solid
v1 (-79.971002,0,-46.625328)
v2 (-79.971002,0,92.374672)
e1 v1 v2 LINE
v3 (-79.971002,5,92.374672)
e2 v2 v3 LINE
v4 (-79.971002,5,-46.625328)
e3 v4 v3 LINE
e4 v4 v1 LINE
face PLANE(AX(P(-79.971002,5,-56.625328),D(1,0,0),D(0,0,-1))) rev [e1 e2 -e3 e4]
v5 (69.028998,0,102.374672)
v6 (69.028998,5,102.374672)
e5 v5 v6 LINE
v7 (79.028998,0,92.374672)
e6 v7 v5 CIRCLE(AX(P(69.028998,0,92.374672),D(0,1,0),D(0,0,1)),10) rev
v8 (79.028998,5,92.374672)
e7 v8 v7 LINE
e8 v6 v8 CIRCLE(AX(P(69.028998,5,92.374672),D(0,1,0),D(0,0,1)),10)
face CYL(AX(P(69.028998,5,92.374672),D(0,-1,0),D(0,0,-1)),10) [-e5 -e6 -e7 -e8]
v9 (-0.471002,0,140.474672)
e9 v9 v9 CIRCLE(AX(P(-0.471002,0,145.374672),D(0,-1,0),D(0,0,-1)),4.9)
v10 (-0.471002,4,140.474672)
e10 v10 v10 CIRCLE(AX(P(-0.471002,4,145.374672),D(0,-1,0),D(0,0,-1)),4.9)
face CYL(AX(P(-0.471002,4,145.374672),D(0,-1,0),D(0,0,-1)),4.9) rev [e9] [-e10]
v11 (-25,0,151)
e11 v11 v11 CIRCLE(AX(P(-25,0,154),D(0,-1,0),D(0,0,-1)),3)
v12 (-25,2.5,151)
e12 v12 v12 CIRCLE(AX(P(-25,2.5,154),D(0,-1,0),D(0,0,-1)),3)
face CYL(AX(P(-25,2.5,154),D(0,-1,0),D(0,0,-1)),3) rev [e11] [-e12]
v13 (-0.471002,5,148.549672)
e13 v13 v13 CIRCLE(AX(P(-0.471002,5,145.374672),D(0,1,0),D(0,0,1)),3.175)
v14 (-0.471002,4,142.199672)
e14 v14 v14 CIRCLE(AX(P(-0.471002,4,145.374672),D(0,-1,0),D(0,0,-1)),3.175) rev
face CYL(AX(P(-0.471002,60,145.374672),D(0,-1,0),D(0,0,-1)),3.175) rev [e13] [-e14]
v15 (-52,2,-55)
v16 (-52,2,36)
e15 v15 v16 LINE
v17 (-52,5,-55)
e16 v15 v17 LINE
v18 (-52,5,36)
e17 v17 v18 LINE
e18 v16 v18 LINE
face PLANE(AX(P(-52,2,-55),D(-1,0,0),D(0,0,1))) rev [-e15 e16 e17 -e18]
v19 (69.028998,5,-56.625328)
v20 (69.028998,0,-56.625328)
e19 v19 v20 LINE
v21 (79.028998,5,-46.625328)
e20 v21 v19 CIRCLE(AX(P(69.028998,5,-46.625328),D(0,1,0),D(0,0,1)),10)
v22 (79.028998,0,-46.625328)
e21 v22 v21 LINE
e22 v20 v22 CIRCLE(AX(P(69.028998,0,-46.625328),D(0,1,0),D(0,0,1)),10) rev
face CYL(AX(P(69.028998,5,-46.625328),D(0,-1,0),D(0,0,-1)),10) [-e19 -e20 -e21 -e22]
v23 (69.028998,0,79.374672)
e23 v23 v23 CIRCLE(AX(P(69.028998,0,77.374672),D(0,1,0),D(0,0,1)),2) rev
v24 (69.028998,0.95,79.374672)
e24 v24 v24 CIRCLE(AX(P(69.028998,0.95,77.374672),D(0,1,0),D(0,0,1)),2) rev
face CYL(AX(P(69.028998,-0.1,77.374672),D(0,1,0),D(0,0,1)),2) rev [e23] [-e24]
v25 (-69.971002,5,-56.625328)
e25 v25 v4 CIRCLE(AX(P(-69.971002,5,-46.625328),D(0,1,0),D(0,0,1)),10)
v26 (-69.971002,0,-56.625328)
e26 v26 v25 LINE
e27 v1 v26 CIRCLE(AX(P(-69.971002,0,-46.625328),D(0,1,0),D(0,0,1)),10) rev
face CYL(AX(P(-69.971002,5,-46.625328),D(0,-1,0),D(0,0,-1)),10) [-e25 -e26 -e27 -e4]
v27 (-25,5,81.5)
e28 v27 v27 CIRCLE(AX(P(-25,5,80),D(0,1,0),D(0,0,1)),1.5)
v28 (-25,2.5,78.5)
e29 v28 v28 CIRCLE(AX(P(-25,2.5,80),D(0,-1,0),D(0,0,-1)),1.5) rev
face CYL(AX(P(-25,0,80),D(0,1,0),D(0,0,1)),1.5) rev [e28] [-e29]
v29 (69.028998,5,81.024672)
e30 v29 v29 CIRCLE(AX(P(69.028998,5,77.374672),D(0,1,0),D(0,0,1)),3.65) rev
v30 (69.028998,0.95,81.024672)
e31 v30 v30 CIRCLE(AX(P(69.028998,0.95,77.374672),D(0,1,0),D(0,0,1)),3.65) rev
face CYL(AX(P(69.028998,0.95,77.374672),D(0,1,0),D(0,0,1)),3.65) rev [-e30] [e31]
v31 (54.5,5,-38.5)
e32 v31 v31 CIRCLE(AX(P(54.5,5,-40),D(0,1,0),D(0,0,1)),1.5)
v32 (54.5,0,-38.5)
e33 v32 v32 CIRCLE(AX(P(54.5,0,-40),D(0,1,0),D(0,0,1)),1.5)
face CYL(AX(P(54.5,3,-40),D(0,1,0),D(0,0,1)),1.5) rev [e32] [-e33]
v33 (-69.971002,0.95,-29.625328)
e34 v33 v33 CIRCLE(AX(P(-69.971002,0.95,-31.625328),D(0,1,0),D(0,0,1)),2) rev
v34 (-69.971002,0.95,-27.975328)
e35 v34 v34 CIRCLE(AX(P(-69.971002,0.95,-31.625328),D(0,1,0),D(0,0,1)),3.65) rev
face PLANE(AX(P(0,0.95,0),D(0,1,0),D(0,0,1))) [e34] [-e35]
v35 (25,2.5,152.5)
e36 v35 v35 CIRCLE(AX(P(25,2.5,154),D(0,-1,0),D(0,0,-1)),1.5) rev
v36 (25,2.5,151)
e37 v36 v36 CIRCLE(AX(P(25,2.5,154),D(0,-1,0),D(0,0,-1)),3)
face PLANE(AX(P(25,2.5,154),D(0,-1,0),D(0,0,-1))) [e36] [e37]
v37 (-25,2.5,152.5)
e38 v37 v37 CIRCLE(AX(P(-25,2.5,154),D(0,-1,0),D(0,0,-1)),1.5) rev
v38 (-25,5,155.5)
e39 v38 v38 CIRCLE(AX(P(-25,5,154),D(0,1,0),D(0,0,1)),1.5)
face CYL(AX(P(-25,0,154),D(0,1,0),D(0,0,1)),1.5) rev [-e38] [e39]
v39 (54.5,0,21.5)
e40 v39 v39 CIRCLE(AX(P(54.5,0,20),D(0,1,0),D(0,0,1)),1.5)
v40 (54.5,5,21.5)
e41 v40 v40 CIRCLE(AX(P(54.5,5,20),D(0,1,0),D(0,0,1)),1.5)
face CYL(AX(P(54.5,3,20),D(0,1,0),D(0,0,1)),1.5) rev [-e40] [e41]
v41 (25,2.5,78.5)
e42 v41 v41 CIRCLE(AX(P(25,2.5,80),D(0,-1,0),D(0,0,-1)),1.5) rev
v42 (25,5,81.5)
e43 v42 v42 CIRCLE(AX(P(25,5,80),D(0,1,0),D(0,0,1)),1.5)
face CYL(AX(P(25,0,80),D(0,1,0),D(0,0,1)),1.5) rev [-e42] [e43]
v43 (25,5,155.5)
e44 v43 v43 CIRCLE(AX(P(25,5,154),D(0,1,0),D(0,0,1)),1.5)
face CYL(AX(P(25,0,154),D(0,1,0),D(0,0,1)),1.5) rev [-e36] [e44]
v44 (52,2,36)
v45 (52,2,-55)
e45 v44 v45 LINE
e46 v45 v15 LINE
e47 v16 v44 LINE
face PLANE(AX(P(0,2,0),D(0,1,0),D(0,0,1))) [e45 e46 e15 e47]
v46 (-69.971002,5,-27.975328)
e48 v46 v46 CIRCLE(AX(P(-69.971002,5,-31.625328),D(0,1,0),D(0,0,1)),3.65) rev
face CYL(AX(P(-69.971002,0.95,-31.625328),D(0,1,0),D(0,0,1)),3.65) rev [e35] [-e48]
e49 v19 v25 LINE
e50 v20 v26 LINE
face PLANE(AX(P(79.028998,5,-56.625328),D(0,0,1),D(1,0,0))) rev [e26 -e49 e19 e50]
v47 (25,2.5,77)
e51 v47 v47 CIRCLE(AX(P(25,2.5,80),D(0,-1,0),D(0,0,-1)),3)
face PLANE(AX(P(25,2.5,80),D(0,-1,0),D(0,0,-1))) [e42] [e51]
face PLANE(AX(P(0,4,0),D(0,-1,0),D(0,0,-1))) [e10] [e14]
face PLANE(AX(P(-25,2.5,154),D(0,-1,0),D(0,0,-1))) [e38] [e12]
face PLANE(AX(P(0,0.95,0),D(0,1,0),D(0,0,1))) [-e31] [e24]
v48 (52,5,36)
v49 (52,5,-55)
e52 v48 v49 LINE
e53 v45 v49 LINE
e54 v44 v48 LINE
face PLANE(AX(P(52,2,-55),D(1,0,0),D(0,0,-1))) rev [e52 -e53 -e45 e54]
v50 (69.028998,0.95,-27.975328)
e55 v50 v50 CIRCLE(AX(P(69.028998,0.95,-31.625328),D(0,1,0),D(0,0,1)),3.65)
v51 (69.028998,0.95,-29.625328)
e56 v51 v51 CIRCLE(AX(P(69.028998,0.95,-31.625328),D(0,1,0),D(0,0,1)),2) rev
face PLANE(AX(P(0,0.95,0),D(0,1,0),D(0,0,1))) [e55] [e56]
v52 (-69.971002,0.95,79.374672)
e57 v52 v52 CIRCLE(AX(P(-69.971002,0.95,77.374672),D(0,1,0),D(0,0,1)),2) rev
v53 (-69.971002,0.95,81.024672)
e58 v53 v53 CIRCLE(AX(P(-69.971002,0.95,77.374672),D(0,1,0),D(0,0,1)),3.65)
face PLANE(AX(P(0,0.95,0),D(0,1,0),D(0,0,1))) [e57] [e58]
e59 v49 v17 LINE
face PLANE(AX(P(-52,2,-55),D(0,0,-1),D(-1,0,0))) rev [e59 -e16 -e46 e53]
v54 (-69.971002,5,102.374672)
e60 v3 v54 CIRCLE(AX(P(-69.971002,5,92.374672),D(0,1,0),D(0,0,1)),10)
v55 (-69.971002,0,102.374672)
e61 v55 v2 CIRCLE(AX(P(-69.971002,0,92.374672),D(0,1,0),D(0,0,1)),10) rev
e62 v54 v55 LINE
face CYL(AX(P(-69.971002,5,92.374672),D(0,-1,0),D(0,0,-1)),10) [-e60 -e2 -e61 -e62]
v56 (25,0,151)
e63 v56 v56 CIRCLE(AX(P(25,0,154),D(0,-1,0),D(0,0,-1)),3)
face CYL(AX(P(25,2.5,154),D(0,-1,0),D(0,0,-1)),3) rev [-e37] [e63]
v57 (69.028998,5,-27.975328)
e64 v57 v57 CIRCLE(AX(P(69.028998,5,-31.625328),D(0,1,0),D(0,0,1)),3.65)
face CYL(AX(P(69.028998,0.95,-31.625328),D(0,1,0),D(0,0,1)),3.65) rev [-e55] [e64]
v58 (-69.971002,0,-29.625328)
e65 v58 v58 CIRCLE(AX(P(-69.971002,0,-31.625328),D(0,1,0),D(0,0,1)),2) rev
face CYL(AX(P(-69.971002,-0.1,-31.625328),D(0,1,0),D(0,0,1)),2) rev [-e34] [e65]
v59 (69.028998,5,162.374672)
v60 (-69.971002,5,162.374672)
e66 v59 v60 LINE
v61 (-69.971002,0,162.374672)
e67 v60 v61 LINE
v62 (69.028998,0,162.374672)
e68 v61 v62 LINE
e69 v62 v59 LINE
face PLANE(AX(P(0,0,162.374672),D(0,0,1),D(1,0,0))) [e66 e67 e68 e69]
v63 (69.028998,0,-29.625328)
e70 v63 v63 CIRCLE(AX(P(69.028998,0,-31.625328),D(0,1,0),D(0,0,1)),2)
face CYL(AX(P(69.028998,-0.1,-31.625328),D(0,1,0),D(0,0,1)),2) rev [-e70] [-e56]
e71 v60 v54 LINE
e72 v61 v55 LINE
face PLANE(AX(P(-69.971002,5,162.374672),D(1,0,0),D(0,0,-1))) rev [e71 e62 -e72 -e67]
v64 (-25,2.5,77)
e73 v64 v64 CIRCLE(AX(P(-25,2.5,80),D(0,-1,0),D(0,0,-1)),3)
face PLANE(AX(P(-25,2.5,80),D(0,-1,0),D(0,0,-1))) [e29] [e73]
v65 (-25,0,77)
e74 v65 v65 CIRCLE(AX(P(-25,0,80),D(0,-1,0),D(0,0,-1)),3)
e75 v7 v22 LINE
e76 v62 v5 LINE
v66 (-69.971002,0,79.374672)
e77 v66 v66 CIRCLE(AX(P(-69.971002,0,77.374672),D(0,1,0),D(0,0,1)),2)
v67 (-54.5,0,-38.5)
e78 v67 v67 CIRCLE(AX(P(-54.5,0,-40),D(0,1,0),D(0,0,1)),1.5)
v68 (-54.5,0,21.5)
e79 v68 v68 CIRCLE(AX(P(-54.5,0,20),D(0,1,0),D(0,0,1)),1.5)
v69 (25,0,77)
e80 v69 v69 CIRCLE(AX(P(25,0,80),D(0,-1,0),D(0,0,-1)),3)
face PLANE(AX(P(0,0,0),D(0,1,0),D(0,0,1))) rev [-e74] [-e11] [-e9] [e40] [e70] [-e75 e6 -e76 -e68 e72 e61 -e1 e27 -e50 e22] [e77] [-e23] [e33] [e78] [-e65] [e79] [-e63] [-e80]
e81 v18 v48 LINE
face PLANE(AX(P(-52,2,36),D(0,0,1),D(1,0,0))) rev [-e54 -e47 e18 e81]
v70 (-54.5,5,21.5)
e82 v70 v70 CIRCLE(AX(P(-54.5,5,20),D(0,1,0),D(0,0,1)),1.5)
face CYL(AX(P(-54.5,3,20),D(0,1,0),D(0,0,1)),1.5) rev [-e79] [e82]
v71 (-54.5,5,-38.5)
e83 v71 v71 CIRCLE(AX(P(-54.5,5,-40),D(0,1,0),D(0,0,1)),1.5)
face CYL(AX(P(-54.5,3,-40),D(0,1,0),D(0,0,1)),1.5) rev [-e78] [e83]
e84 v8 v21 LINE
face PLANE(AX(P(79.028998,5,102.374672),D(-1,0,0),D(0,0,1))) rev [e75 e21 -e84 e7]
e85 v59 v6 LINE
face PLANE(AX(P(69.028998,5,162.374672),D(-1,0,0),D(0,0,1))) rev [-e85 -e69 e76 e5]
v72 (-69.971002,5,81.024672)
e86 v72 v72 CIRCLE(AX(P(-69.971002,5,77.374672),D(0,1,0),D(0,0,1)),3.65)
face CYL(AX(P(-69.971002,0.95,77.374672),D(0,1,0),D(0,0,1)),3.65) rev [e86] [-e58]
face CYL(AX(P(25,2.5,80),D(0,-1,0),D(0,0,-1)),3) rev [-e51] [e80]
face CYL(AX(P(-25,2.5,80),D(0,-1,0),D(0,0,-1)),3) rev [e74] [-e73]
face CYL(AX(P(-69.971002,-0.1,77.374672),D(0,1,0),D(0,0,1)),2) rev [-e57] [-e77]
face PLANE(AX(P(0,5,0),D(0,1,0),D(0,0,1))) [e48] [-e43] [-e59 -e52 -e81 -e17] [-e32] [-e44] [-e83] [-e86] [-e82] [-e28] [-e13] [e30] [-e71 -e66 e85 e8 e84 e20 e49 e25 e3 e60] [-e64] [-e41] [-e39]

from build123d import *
from build123d.topology import SkipClean

# Parameters (mm, degrees)
SKETCH_1_W               = 159
SKETCH_1_H               = 159
EXTRUDE_1_DEPTH          = 5
SKETCH_2_R               = 2
CUT_EXTRUDE_1_DEPTH      = 5.1
SKETCH_3_R               = 3.65
CUT_EXTRUDE_2_DEPTH      = 4.05
EXTRUDE_3_DEPTH          = 60
SKETCH_6_R               = 3.175
CUT_EXTRUDE_3_DEPTH      = 60
SKETCH_7_R               = 4.9
CUT_EXTRUDE_4_DEPTH      = 4
SKETCH_8_W               = 110.4
SKETCH_8_H               = 88.4
CUT_EXTRUDE_5_DEPTH      = 3
SKETCH_9_R               = 1.5
CUT_EXTRUDE_6_DEPTH      = 10
FILLET_1_R               = 10
FILLET_2_R               = 10
FILLET_3_R               = 10
FILLET_4_R               = 10
SKETCH_11_W              = 49.5
SKETCH_11_H              = 5
EXTRUDE_4_DEPTH          = 60
SKETCH_12_W              = 49.5
SKETCH_12_H              = 5
EXTRUDE_5_DEPTH          = 60
SKETCH_13_R              = 1.5
CUT_EXTRUDE_7_DEPTH      = 5
SKETCH_14_R              = 3
CUT_EXTRUDE_8_DEPTH      = 2.5
SKETCH_16_R              = 1.5
EXTRUDE_6_DEPTH          = 0.5
SKETCH_16_R_2            = 1.448084079
EXTRUDE_6_2_DEPTH        = 0.5
EXTRUDE_6_3_DEPTH        = 0.5
EXTRUDE_6_4_DEPTH        = 0.5
SKETCH_18_W              = 110.4
SKETCH_18_H              = 88.4
EXTRUDE_7_DEPTH          = 3
SKETCH_18_2_W            = 110.4
SKETCH_18_2_H            = 88.4
EXTRUDE_8_DEPTH          = 2
SKETCH_22_W              = 104
SKETCH_22_H              = 91
CUT_EXTRUDE_10_DEPTH     = 3
SKETCH_23_R              = 1.5
CUT_EXTRUDE_11_DEPTH     = 2
CUT_EXTRUDE_12_OUTLINE_R = 1.5
CUT_EXTRUDE_12_DEPTH     = 3


# Read off the part's stored shape, not the designer's step: 切除-拉伸12
with BuildPart() as part:
    # 草图1 → 凸台-拉伸1 (new body)
    with BuildSketch(Plane(origin=(0, 0, 0), x_dir=(1, 0, 0), z_dir=(0, 1, 0))):
        with Locations((-0.471002014, -22.874671738)):
            Rectangle(SKETCH_1_W, SKETCH_1_H)
    extrude(amount=EXTRUDE_1_DEPTH)

    # 草图2 → 切除-拉伸1 (cut)
    with BuildSketch(Plane(origin=(0, 5, 0), x_dir=(1, 0, 0), z_dir=(0, 1, 0))):
        with Locations(Location((-69.971002014, -77.374671738, 0), (0, 0, 270))):
            Circle(SKETCH_2_R)
        with Locations(Location((-69.971002014, 31.625328262, 0), (0, 0, 270))):
            Circle(SKETCH_2_R)
        with Locations(Location((69.028997986, -77.374671738, 0), (0, 0, 270))):
            Circle(SKETCH_2_R)
        with Locations(Location((69.028997986, 31.625328262, 0), (0, 0, 270))):
            Circle(SKETCH_2_R)
    extrude(amount=-CUT_EXTRUDE_1_DEPTH, mode=Mode.SUBTRACT)

    # 草图3 → 切除-拉伸2 (cut)
    with BuildSketch(Plane(origin=(0, 5, 0), x_dir=(1, 0, 0), z_dir=(0, 1, 0))):
        with Locations(Location((-69.971002014, -77.374671738, 0), (0, 0, 270))):
            Circle(SKETCH_3_R)
        with Locations(Location((69.028997986, -77.374671738, 0), (0, 0, 270))):
            Circle(SKETCH_3_R)
        with Locations(Location((69.028997986, 31.625328262, 0), (0, 0, 270))):
            Circle(SKETCH_3_R)
        with Locations(Location((-69.971002014, 31.625328262, 0), (0, 0, 270))):
            Circle(SKETCH_3_R)
    extrude(amount=-CUT_EXTRUDE_2_DEPTH, mode=Mode.SUBTRACT)

    # 草图4 → 凸台-拉伸3 (add)
    with BuildSketch(Plane.XY.offset(102.374671738)):
        Polygon((19.528997986, 5), (-0.471002014, 5), (-20.471002014, 5), (-20.471002014, 0), (19.528997986, 0), align=None)
    extrude(amount=EXTRUDE_3_DEPTH)

    # 草图6 → 切除-拉伸3 (cut)
    with BuildSketch(Plane.XZ):
        with Locations(Location((-0.471002014, 145.374671738, 0), (0, 0, 270))):
            Circle(SKETCH_6_R)
    extrude(amount=-CUT_EXTRUDE_3_DEPTH, mode=Mode.SUBTRACT)

    # 草图7 → 切除-拉伸4 (cut)
    with BuildSketch(Plane(origin=(0, 0, 0), x_dir=(-1, 0, 0), z_dir=(0, -1, 0))):
        with Locations(Location((0.471002014, -145.374671738, 0), (0, 0, 90))):
            Circle(SKETCH_7_R)
    extrude(amount=-CUT_EXTRUDE_4_DEPTH, mode=Mode.SUBTRACT)

    # 草图8 → 切除-拉伸5 (cut)
    with BuildSketch(Plane(origin=(0, 5, 0), x_dir=(1, 0, 0), z_dir=(0, 1, 0))):
        with Locations((-0.471002014, 10.625328262)):
            Rectangle(SKETCH_8_W, SKETCH_8_H)
    extrude(amount=-CUT_EXTRUDE_5_DEPTH, mode=Mode.SUBTRACT)

    # 草图9 → 切除-拉伸6 (cut)
    with BuildSketch(Plane(origin=(0, 2, 0), x_dir=(1, 0, 0), z_dir=(0, 1, 0))):
        with Locations(Location((52.028997986, 52.125328262, 0), (0, 0, 270))):
            Circle(SKETCH_9_R)
        with Locations(Location((52.028997986, -30.874671738, 0), (0, 0, 270))):
            Circle(SKETCH_9_R)
        with Locations(Location((-52.971002014, -30.874671738, 0), (0, 0, 270))):
            Circle(SKETCH_9_R)
        with Locations(Location((-52.971002014, 52.125328262, 0), (0, 0, 270))):
            Circle(SKETCH_9_R)
    extrude(amount=-CUT_EXTRUDE_6_DEPTH, mode=Mode.SUBTRACT)

    # 圆角1
    fillet_1_edges = [part.edges().sort_by_distance(p)[0] for p in [
        (79.028997986, 2.5, -56.625328262),
    ]]
    fillet(fillet_1_edges, radius=FILLET_1_R)

    # 圆角2
    fillet_2_edges = [part.edges().sort_by_distance(p)[0] for p in [
        (-79.971002014, 2.5, -56.625328262),
    ]]
    fillet(fillet_2_edges, radius=FILLET_2_R)

    # 圆角3
    fillet_3_edges = [part.edges().sort_by_distance(p)[0] for p in [
        (-79.971002014, 2.5, 102.374671738),
    ]]
    fillet(fillet_3_edges, radius=FILLET_3_R)

    # 圆角4
    fillet_4_edges = [part.edges().sort_by_distance(p)[0] for p in [
        (79.028997986, 2.5, 102.374671738),
    ]]
    fillet(fillet_4_edges, radius=FILLET_4_R)

    # 草图11 → 凸台-拉伸4 (add)
    with BuildSketch(Plane.XY.offset(102.374671738)):
        with Locations((-45.221002014, 2.5)):
            Rectangle(SKETCH_11_W, SKETCH_11_H)
    extrude(amount=EXTRUDE_4_DEPTH)

    # 草图12 → 凸台-拉伸5 (add)
    with BuildSketch(Plane.XY.offset(102.374671738)):
        with Locations((44.278997986, 2.5)):
            Rectangle(SKETCH_12_W, SKETCH_12_H)
    extrude(amount=EXTRUDE_5_DEPTH)

    # 草图13 → 切除-拉伸7 (cut)
    with BuildSketch(Plane(origin=(0, 5, 0), x_dir=(1, 0, 0), z_dir=(0, 1, 0))):
        with Locations(Location((-25, -80, 0), (0, 0, 270))):
            Circle(SKETCH_13_R)
        with Locations(Location((-25, -154, 0), (0, 0, 270))):
            Circle(SKETCH_13_R)
        with Locations(Location((25, -80, 0), (0, 0, 270))):
            Circle(SKETCH_13_R)
        with Locations(Location((25, -154, 0), (0, 0, 270))):
            Circle(SKETCH_13_R)
    extrude(amount=-CUT_EXTRUDE_7_DEPTH, mode=Mode.SUBTRACT)

    # 草图14 → 切除-拉伸8 (cut)
    with BuildSketch(Plane.XZ):
        with Locations(Location((-25, 80, 0), (0, 0, 270))):
            Circle(SKETCH_14_R)
        with Locations(Location((-25, 154, 0), (0, 0, 270))):
            Circle(SKETCH_14_R)
        with Locations(Location((25, 154, 0), (0, 0, 270))):
            Circle(SKETCH_14_R)
        with Locations(Location((25, 80, 0), (0, 0, 270))):
            Circle(SKETCH_14_R)
    extrude(amount=-CUT_EXTRUDE_8_DEPTH, mode=Mode.SUBTRACT)



with BuildPart() as body_2:
    # 草图16 → 凸台-拉伸6 (new body)
    with BuildSketch(Plane(origin=(0, 2, 0), x_dir=(1, 0, 0), z_dir=(0, 1, 0))):
        with Locations(Location((-52.971002014, 52.125328262, 0), (0, 0, 270))):
            Circle(SKETCH_16_R)
    extrude(amount=EXTRUDE_6_DEPTH)


with BuildPart() as body_3:
    # 草图16 → Extrude 6 2 (new body)
    with BuildSketch(Plane(origin=(0, 2, 0), x_dir=(1, 0, 0), z_dir=(0, 1, 0))):
        with Locations(Location((52.028997986, 52.125328262, 0), (0, 0, 270))):
            Circle(SKETCH_16_R_2)
    extrude(amount=EXTRUDE_6_2_DEPTH)


with BuildPart() as body_4:
    # 草图16 → Extrude 6 3 (new body)
    with BuildSketch(Plane(origin=(0, 2, 0), x_dir=(1, 0, 0), z_dir=(0, 1, 0))):
        with Locations(Location((-52.971002014, -30.874671738, 0), (0, 0, 270))):
            Circle(SKETCH_16_R)
    extrude(amount=EXTRUDE_6_3_DEPTH)


with BuildPart() as body_5:
    # 草图16 → Extrude 6 4 (new body)
    with BuildSketch(Plane(origin=(0, 2, 0), x_dir=(1, 0, 0), z_dir=(0, 1, 0))):
        with Locations(Location((52.028997986, -30.874671738, 0), (0, 0, 270))):
            Circle(SKETCH_16_R)
    extrude(amount=EXTRUDE_6_4_DEPTH)


with BuildPart() as part_1:
    add(part.part)

    add(body_2.part)  # 凸台-拉伸7 merges body 2

    add(body_3.part)  # 凸台-拉伸7 merges body 3

    add(body_4.part)  # 凸台-拉伸7 merges body 4

    add(body_5.part)  # 凸台-拉伸7 merges body 5
    # 草图18 → 凸台-拉伸7 (add)
    with BuildSketch(Plane(origin=(0, 2, 0), x_dir=(1, 0, 0), z_dir=(0, 1, 0))):
        with Locations((-0.471002014, 10.625328262)):
            Rectangle(SKETCH_18_W, SKETCH_18_H)
    extrude(amount=EXTRUDE_7_DEPTH)

    # 草图18<2> → 凸台-拉伸8 (add)
    with BuildSketch(Plane(origin=(0, 2, 0), x_dir=(1, 0, 0), z_dir=(0, 1, 0))):
        with Locations((-0.471002014, 10.625328262)):
            Rectangle(SKETCH_18_2_W, SKETCH_18_2_H)
    extrude(amount=-EXTRUDE_8_DEPTH)

    # 草图22 → 切除-拉伸10 (cut)
    with BuildSketch(Plane(origin=(0, 5, 0), x_dir=(1, 0, 0), z_dir=(0, 1, 0))):
        with Locations((0, 9.5)):
            Rectangle(SKETCH_22_W, SKETCH_22_H)
    extrude(amount=-CUT_EXTRUDE_10_DEPTH, mode=Mode.SUBTRACT)

    # 草图23 → 切除-拉伸11 (cut)
    with BuildSketch(Plane(origin=(0, 5, 0), x_dir=(1, 0, 0), z_dir=(0, 1, 0))):
        with Locations(Location((-54.5, 40, 0), (0, 0, 270))):
            Circle(SKETCH_23_R)
        with Locations(Location((54.5, 40, 0), (0, 0, 270))):
            Circle(SKETCH_23_R)
        with Locations(Location((-54.5, -20, 0), (0, 0, 270))):
            Circle(SKETCH_23_R)
        with Locations(Location((54.5, -20, 0), (0, 0, 270))):
            Circle(SKETCH_23_R)
    extrude(amount=-CUT_EXTRUDE_11_DEPTH, mode=Mode.SUBTRACT)

    # 切除-拉伸12 outline → 切除-拉伸12 (cut)
    with SkipClean():  # the faces are left unmerged after this step: merging them gives an invalid solid
        with BuildSketch(Plane(origin=(0, 0, 0), x_dir=(1, 0, 0), z_dir=(0, 1, 0))):
            with Locations((-54.5, 40)):
                Circle(CUT_EXTRUDE_12_OUTLINE_R)
            with Locations((54.5, -20)):
                Circle(CUT_EXTRUDE_12_OUTLINE_R)
            with Locations((-54.5, -20)):
                Circle(CUT_EXTRUDE_12_OUTLINE_R)
            with Locations((54.5, 40)):
                Circle(CUT_EXTRUDE_12_OUTLINE_R)
        extrude(amount=CUT_EXTRUDE_12_DEPTH, mode=Mode.SUBTRACT)


solid = part_1.part
